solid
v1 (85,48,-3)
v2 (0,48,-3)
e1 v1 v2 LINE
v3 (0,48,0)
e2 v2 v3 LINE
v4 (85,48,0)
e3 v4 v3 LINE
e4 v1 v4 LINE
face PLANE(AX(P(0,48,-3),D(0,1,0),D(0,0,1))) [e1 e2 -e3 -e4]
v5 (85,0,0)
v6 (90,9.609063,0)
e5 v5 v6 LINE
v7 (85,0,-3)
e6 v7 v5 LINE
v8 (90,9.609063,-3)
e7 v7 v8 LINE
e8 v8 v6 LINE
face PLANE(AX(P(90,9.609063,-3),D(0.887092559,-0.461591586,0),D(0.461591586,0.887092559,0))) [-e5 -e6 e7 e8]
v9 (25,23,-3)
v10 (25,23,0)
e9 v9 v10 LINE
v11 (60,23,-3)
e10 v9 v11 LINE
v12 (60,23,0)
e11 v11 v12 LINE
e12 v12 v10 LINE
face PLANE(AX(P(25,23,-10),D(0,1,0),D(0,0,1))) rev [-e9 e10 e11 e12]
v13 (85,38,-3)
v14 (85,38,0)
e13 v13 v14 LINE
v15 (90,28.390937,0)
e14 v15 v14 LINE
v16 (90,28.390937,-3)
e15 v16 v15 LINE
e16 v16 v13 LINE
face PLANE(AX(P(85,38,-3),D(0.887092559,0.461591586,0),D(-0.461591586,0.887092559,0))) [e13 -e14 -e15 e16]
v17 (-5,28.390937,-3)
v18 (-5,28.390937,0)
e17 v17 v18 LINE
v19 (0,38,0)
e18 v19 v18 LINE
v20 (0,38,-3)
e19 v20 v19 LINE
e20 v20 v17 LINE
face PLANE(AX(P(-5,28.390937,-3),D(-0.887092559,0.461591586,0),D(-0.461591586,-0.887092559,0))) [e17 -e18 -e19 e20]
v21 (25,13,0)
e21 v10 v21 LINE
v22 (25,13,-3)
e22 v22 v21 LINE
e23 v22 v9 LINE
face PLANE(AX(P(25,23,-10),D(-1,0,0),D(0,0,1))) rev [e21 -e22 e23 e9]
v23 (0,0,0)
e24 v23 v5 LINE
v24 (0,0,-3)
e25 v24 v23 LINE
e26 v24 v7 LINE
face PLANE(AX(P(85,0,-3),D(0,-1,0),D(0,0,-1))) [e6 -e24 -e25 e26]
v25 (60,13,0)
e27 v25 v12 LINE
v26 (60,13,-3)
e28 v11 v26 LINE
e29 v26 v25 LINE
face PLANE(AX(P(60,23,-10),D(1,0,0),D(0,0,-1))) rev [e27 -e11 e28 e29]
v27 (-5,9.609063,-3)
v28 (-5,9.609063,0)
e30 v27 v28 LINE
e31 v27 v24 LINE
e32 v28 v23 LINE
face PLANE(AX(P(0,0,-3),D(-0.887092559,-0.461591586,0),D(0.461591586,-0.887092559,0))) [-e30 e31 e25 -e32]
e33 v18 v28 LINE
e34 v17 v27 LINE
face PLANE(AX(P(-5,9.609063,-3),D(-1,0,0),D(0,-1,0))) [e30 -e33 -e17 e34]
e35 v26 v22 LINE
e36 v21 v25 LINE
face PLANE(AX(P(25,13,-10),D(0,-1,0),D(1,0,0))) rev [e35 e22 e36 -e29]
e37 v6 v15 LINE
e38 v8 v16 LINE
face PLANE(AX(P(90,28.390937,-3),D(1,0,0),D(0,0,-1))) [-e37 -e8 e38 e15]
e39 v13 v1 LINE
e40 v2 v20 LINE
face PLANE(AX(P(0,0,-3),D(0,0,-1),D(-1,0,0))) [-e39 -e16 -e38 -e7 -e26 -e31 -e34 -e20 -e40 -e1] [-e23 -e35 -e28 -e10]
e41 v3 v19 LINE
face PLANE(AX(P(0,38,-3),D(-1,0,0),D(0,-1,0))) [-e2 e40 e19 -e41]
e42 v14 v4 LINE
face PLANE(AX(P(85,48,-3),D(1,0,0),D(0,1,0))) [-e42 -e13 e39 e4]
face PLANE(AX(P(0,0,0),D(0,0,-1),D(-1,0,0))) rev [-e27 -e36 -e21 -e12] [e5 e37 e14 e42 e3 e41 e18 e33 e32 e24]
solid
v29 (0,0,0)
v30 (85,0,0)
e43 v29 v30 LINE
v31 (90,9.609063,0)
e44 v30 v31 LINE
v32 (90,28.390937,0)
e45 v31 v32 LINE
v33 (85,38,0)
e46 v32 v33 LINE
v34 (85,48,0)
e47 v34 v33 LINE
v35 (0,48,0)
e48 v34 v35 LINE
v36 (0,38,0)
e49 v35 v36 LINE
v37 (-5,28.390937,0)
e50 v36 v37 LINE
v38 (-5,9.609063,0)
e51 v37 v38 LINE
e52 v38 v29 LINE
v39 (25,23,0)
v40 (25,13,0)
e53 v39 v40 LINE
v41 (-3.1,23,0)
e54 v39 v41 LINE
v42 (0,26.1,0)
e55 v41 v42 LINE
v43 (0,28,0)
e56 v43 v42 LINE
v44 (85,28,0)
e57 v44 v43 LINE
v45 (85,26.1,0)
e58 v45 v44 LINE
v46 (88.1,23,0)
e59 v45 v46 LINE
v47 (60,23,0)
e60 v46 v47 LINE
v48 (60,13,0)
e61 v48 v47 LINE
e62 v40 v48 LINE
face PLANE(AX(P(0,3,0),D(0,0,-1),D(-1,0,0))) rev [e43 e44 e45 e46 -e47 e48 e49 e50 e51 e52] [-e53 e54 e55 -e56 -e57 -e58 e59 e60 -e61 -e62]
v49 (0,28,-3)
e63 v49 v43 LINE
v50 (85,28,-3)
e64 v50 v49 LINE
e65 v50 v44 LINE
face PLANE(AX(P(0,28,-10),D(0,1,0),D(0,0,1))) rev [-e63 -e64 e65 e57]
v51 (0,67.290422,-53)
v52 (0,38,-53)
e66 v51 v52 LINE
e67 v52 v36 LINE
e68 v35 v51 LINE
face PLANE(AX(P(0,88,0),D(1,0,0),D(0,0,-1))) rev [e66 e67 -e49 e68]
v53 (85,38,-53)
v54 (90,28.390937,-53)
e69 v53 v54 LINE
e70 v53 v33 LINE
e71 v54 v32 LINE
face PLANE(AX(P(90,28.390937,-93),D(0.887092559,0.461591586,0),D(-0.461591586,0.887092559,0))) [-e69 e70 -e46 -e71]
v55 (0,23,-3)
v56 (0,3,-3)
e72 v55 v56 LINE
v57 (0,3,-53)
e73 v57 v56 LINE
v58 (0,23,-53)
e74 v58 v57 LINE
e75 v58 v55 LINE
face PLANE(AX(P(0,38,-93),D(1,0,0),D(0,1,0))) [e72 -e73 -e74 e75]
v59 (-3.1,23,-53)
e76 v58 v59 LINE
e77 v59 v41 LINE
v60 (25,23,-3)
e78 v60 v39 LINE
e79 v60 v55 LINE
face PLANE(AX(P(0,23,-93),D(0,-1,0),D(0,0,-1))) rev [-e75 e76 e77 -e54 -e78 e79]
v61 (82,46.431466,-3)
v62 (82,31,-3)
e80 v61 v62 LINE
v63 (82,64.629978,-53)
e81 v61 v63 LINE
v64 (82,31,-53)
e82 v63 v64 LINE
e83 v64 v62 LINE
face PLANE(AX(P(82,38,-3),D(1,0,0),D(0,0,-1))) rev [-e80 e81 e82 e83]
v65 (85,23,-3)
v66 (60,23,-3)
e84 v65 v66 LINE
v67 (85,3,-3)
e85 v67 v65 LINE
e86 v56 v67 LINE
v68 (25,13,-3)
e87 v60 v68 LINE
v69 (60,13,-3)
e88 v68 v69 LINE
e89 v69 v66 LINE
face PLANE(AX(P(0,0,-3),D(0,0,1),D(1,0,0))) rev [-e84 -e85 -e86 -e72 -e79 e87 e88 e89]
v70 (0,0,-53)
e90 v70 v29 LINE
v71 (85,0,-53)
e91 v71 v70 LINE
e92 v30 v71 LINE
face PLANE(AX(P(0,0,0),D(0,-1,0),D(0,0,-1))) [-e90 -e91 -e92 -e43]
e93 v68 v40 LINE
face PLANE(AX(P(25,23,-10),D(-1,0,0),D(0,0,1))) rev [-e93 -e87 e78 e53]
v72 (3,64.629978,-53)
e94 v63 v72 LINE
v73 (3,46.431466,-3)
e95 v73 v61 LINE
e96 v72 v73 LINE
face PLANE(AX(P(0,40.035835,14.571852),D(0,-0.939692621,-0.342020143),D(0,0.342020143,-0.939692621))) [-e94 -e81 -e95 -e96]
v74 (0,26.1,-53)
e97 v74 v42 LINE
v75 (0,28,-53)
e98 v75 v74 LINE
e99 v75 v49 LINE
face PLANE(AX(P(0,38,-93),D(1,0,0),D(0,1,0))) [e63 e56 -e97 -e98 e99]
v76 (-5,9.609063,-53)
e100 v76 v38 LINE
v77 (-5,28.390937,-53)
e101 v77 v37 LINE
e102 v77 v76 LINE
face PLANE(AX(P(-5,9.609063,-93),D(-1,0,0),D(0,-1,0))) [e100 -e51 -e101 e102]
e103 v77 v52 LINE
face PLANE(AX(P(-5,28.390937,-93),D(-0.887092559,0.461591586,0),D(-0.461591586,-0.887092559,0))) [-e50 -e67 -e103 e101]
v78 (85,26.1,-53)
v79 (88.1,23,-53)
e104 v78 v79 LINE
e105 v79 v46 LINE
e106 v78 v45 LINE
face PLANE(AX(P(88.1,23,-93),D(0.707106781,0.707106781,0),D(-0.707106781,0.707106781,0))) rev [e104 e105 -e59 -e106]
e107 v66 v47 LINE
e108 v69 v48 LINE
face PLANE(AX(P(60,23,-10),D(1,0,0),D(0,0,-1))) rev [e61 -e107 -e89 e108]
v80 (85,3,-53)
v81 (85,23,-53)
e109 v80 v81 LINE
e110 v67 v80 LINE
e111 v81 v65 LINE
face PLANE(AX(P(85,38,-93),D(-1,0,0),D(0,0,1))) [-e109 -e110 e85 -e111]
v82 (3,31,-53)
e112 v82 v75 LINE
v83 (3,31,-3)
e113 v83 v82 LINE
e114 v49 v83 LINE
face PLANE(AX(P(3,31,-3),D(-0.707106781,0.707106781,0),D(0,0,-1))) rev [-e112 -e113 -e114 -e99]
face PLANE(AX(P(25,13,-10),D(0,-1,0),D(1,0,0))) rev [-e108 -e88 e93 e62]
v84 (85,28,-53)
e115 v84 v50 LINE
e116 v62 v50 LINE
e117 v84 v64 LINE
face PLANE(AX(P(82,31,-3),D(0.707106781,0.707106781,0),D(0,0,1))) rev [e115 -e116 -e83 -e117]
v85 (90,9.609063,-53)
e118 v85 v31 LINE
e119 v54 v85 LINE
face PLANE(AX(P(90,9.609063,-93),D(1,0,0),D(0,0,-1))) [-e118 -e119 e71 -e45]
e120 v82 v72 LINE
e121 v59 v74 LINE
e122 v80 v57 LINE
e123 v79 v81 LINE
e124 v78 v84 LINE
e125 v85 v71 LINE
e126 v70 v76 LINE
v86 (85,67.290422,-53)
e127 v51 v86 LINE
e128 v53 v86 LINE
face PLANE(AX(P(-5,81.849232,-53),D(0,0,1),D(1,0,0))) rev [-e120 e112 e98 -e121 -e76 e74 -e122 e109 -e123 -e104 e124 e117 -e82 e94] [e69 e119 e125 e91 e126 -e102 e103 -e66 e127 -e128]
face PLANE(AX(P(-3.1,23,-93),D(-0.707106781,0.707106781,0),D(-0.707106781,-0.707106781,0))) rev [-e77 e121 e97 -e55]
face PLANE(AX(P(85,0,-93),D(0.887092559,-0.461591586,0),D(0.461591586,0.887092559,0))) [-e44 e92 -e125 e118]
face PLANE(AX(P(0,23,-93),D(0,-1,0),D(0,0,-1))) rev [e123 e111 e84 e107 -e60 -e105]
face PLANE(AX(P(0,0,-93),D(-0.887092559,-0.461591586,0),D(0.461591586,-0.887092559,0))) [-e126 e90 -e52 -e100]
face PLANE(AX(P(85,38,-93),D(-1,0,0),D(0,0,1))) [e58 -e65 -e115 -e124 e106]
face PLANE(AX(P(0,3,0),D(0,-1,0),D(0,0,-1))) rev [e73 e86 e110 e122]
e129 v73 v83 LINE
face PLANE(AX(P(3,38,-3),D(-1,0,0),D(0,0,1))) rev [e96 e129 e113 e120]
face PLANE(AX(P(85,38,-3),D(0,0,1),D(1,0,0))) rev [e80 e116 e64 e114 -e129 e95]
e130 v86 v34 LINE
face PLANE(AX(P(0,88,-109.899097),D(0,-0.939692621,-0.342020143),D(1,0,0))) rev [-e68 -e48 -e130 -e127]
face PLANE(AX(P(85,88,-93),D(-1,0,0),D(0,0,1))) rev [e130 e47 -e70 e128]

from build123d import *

# Parameters (mm, degrees)
SKETCH1_W                      = 85
SKETCH1_H                      = 93
BOSS_EXTRUDE1_BASE_DEPTH       = 3
BOSS_EXTRUDE4_SIDE_WALLS_DEPTH = 93
CUT_EXTRUDE2_START             = 3
CUT_EXTRUDE2_GUIDE_HOLES_DEPTH = 138.881429411
SKETCH15_W                     = 85
SKETCH15_H                     = 20
BOSS_EXTRUDE9_REAR_WALL_DEPTH  = 3
BOSS_EXTRUDE1_START            = 3
SKETCH17_W                     = 85
SKETCH17_H                     = 3
BOSS_EXTRUDE1_REAR_WALL_DEPTH  = 12
SKETCH30_W                     = 85
SKETCH30_H                     = 2
CUT_EXTRUDE1_REAR_WALL_DEPTH   = 10
BOSS_EXTRUDE2_START            = 25
SKETCH20_W                     = 3
SKETCH20_H                     = 90
BOSS_EXTRUDE2_SIDE_WALL_DEPTH  = 10
CHAMFER1_SIDE_WALL_SIZE        = 3
BOSS_EXTRUDE5_SIDE_WALL_DEPTH  = 50
CHAMFER2_ROOF_SIZE             = 40
CHAMFER2_ROOF_SIZE_2           = 109.899096778
SKETCH28_W                     = 85
SKETCH28_H                     = 102.388734274
BOSS_EXTRUDE7_ROOF_DEPTH       = 2.5
SKETCH29_W                     = 5.082998623
SKETCH29_H                     = 88.705427338
SKETCH29_W_2                   = 8.288926101
SKETCH29_H_2                   = 87.454678394
CUT_EXTRUDE1_CLEAN_UP_DEPTH    = 157.630352173
SKETCH31_W                     = 95
SKETCH31_H                     = 40
CUT_EXTRUDE2_CLEAN_UP_DEPTH    = 154.128366882
BOSS_EXTRUDE1_DEPTH            = 3
SKETCH34_W                     = 35
SKETCH34_H                     = 10
CUT_EXTRUDE1_DEPTH             = 10


# Some blends are built 0.0001 mm under size
with BuildPart() as part:
    # Sketch1 → Boss-Extrude1 _Base (new body)
    with BuildSketch(Plane(origin=(0, 0, 0), x_dir=(1, 0, 0), z_dir=(0, 1, 0))):
        with Locations((42.5, 46.5)):
            Rectangle(SKETCH1_W, SKETCH1_H)
    extrude(amount=BOSS_EXTRUDE1_BASE_DEPTH)

    # Sketch5 → Boss-Extrude4 _Side Walls (add, through all)
    with BuildSketch(Plane.XY):
        Polygon((-5, 28.390936655), (0, 38), (0, 0), (-5, 9.609063345), align=None)
        Polygon((90, 9.609063345), (90, 28.390936655), (85, 38), (85, 0), align=None)
    extrude(amount=-BOSS_EXTRUDE4_SIDE_WALLS_DEPTH)

    # Sketch4 → Cut-Extrude2 _Guide Holes (cut, through all)
    with BuildSketch(Plane.XY.offset(CUT_EXTRUDE2_START)):
        Polygon((-3.1, 23), (0, 26.1), (0, 23), align=None)
        Polygon((85, 23), (88.1, 23), (85, 26.1), align=None)
    extrude(amount=-CUT_EXTRUDE2_GUIDE_HOLES_DEPTH, mode=Mode.SUBTRACT)

    # Sketch15 → Boss-Extrude9 _Rear Wall (add)
    with BuildSketch(Plane.XY):
        with Locations((42.5, 13)):
            Rectangle(SKETCH15_W, SKETCH15_H)
    extrude(amount=-BOSS_EXTRUDE9_REAR_WALL_DEPTH)

    # Sketch17 → Boss-Extrude1 _Rear Wall (add)
    with BuildSketch(Plane(origin=(0, 23, 0), x_dir=(1, 0, 0), z_dir=(0, 1, 0)).offset(BOSS_EXTRUDE1_START)):
        with Locations((42.5, 1.5)):
            Rectangle(SKETCH17_W, SKETCH17_H)
    extrude(amount=BOSS_EXTRUDE1_REAR_WALL_DEPTH)

    # Sketch30 → Cut-Extrude1 _Rear Wall (cut)
    with BuildSketch(Plane.XY):
        with Locations((42.5, 27)):
            Rectangle(SKETCH30_W, SKETCH30_H)
    extrude(amount=-CUT_EXTRUDE1_REAR_WALL_DEPTH, mode=Mode.SUBTRACT)

    # Sketch20 → Boss-Extrude2 _Side Wall (add)
    with BuildSketch(Plane(origin=(0, 3, 0), x_dir=(1, 0, 0), z_dir=(0, 1, 0)).offset(BOSS_EXTRUDE2_START)):
        with Locations((1.5, 48)):
            Rectangle(SKETCH20_W, SKETCH20_H)
        with Locations((83.5, 48)):
            Rectangle(SKETCH20_W, SKETCH20_H)
    extrude(amount=BOSS_EXTRUDE2_SIDE_WALL_DEPTH)

    # Chamfer1 _Side Wall
    chamfer1_side_wall_edges = [part.edges().sort_by_distance(p)[0] for p in [
        (82, 28, -48),
        (3, 28, -48),
    ]]
    chamfer(chamfer1_side_wall_edges, length=CHAMFER1_SIDE_WALL_SIZE - 0.0001)  # a hair under: the kernel refuses the full size

    # Sketch26 → Boss-Extrude5 _Side Wall (add)
    with BuildSketch(Plane(origin=(0, 38, 0), x_dir=(1, 0, 0), z_dir=(0, 1, 0))):
        Polygon((0, 0), (0, 93), (3, 93), (3, 3), (82, 3), (82, 93), (85, 93), (85, 0), align=None)
    extrude(amount=BOSS_EXTRUDE5_SIDE_WALL_DEPTH)

    # Chamfer2 _Roof
    # the kernel refuses this chamfer: 109.899096778, 40 mm, written as the material it takes off along each edge
    with BuildSketch(Plane(origin=(370.099657974, 88, 0), x_dir=(0, -0.9950833631817486, 0.09904090225205059), z_dir=(-1, 0, 0))) as chamfer2_roof_piece_1:
        Polygon((CHAMFER2_ROOF_SIZE * 0.995083363182, -CHAMFER2_ROOF_SIZE * 0.0990409022521), (-CHAMFER2_ROOF_SIZE_2 * 0.0990409022522, -CHAMFER2_ROOF_SIZE_2 * 0.995083363183), (0, 0), align=None)
    extrude(amount=655.199315948, mode=Mode.SUBTRACT)

    # Sketch28 → Boss-Extrude7 _Roof (add)
    with BuildSketch(Plane(origin=(0, 42.385066635, 15.426902632), x_dir=(1, 0, 0), z_dir=(0, 0.9396926207859096, 0.34202014332566505))):
        with Locations((42.5, 64.191132583)):
            Rectangle(SKETCH28_W, SKETCH28_H)
    extrude(amount=-BOSS_EXTRUDE7_ROOF_DEPTH)

    # Sketch29 → Cut-Extrude1 _Clean up (cut, through all)
    with BuildSketch(Plane(origin=(90, 0, 0), x_dir=(0, 0, -1), z_dir=(1, 0, 0))):
        with Locations((95.541499312, 44.352713669)):
            Rectangle(SKETCH29_W, SKETCH29_H)
        with Locations((-4.144463051, 43.727339197)):
            Rectangle(SKETCH29_W_2, SKETCH29_H_2)
    extrude(amount=-CUT_EXTRUDE1_CLEAN_UP_DEPTH, mode=Mode.SUBTRACT)

    # Sketch31 → Cut-Extrude2 _Clean Up (cut, through all)
    with BuildSketch(Plane.XZ):
        with Locations((42.5, -73)):
            Rectangle(SKETCH31_W, SKETCH31_H)
    extrude(amount=-CUT_EXTRUDE2_CLEAN_UP_DEPTH, mode=Mode.SUBTRACT)


with BuildPart() as body_2:
    # Sketch33 → Boss-Extrude1 (new body)
    with BuildSketch(Plane.XY):
        Polygon((0, 38), (0, 48), (85, 48), (85, 38), (90, 28.390936655), (90, 9.609063345), (85, 0), (0, 0), (-5, 9.609063345), (-5, 28.390936655), align=None)
    extrude(amount=-BOSS_EXTRUDE1_DEPTH)


with BuildPart() as cut_extrude1_tool:
    # Sketch34 → Cut-Extrude1 (new body)
    with BuildSketch(Plane.XY):
        with Locations((42.5, 18)):
            Rectangle(SKETCH34_W, SKETCH34_H)
    extrude(amount=-CUT_EXTRUDE1_DEPTH)


with BuildPart() as part_1:
    add(part.part)

    # Cut-Extrude1: cut by cut_extrude1_tool
    add(cut_extrude1_tool.part, mode=Mode.SUBTRACT)


with BuildPart() as body_2_1:
    add(body_2.part)

    # Cut-Extrude1: cut by cut_extrude1_tool
    add(cut_extrude1_tool.part, mode=Mode.SUBTRACT)


solid = Compound([part_1.part, body_2_1.part])
